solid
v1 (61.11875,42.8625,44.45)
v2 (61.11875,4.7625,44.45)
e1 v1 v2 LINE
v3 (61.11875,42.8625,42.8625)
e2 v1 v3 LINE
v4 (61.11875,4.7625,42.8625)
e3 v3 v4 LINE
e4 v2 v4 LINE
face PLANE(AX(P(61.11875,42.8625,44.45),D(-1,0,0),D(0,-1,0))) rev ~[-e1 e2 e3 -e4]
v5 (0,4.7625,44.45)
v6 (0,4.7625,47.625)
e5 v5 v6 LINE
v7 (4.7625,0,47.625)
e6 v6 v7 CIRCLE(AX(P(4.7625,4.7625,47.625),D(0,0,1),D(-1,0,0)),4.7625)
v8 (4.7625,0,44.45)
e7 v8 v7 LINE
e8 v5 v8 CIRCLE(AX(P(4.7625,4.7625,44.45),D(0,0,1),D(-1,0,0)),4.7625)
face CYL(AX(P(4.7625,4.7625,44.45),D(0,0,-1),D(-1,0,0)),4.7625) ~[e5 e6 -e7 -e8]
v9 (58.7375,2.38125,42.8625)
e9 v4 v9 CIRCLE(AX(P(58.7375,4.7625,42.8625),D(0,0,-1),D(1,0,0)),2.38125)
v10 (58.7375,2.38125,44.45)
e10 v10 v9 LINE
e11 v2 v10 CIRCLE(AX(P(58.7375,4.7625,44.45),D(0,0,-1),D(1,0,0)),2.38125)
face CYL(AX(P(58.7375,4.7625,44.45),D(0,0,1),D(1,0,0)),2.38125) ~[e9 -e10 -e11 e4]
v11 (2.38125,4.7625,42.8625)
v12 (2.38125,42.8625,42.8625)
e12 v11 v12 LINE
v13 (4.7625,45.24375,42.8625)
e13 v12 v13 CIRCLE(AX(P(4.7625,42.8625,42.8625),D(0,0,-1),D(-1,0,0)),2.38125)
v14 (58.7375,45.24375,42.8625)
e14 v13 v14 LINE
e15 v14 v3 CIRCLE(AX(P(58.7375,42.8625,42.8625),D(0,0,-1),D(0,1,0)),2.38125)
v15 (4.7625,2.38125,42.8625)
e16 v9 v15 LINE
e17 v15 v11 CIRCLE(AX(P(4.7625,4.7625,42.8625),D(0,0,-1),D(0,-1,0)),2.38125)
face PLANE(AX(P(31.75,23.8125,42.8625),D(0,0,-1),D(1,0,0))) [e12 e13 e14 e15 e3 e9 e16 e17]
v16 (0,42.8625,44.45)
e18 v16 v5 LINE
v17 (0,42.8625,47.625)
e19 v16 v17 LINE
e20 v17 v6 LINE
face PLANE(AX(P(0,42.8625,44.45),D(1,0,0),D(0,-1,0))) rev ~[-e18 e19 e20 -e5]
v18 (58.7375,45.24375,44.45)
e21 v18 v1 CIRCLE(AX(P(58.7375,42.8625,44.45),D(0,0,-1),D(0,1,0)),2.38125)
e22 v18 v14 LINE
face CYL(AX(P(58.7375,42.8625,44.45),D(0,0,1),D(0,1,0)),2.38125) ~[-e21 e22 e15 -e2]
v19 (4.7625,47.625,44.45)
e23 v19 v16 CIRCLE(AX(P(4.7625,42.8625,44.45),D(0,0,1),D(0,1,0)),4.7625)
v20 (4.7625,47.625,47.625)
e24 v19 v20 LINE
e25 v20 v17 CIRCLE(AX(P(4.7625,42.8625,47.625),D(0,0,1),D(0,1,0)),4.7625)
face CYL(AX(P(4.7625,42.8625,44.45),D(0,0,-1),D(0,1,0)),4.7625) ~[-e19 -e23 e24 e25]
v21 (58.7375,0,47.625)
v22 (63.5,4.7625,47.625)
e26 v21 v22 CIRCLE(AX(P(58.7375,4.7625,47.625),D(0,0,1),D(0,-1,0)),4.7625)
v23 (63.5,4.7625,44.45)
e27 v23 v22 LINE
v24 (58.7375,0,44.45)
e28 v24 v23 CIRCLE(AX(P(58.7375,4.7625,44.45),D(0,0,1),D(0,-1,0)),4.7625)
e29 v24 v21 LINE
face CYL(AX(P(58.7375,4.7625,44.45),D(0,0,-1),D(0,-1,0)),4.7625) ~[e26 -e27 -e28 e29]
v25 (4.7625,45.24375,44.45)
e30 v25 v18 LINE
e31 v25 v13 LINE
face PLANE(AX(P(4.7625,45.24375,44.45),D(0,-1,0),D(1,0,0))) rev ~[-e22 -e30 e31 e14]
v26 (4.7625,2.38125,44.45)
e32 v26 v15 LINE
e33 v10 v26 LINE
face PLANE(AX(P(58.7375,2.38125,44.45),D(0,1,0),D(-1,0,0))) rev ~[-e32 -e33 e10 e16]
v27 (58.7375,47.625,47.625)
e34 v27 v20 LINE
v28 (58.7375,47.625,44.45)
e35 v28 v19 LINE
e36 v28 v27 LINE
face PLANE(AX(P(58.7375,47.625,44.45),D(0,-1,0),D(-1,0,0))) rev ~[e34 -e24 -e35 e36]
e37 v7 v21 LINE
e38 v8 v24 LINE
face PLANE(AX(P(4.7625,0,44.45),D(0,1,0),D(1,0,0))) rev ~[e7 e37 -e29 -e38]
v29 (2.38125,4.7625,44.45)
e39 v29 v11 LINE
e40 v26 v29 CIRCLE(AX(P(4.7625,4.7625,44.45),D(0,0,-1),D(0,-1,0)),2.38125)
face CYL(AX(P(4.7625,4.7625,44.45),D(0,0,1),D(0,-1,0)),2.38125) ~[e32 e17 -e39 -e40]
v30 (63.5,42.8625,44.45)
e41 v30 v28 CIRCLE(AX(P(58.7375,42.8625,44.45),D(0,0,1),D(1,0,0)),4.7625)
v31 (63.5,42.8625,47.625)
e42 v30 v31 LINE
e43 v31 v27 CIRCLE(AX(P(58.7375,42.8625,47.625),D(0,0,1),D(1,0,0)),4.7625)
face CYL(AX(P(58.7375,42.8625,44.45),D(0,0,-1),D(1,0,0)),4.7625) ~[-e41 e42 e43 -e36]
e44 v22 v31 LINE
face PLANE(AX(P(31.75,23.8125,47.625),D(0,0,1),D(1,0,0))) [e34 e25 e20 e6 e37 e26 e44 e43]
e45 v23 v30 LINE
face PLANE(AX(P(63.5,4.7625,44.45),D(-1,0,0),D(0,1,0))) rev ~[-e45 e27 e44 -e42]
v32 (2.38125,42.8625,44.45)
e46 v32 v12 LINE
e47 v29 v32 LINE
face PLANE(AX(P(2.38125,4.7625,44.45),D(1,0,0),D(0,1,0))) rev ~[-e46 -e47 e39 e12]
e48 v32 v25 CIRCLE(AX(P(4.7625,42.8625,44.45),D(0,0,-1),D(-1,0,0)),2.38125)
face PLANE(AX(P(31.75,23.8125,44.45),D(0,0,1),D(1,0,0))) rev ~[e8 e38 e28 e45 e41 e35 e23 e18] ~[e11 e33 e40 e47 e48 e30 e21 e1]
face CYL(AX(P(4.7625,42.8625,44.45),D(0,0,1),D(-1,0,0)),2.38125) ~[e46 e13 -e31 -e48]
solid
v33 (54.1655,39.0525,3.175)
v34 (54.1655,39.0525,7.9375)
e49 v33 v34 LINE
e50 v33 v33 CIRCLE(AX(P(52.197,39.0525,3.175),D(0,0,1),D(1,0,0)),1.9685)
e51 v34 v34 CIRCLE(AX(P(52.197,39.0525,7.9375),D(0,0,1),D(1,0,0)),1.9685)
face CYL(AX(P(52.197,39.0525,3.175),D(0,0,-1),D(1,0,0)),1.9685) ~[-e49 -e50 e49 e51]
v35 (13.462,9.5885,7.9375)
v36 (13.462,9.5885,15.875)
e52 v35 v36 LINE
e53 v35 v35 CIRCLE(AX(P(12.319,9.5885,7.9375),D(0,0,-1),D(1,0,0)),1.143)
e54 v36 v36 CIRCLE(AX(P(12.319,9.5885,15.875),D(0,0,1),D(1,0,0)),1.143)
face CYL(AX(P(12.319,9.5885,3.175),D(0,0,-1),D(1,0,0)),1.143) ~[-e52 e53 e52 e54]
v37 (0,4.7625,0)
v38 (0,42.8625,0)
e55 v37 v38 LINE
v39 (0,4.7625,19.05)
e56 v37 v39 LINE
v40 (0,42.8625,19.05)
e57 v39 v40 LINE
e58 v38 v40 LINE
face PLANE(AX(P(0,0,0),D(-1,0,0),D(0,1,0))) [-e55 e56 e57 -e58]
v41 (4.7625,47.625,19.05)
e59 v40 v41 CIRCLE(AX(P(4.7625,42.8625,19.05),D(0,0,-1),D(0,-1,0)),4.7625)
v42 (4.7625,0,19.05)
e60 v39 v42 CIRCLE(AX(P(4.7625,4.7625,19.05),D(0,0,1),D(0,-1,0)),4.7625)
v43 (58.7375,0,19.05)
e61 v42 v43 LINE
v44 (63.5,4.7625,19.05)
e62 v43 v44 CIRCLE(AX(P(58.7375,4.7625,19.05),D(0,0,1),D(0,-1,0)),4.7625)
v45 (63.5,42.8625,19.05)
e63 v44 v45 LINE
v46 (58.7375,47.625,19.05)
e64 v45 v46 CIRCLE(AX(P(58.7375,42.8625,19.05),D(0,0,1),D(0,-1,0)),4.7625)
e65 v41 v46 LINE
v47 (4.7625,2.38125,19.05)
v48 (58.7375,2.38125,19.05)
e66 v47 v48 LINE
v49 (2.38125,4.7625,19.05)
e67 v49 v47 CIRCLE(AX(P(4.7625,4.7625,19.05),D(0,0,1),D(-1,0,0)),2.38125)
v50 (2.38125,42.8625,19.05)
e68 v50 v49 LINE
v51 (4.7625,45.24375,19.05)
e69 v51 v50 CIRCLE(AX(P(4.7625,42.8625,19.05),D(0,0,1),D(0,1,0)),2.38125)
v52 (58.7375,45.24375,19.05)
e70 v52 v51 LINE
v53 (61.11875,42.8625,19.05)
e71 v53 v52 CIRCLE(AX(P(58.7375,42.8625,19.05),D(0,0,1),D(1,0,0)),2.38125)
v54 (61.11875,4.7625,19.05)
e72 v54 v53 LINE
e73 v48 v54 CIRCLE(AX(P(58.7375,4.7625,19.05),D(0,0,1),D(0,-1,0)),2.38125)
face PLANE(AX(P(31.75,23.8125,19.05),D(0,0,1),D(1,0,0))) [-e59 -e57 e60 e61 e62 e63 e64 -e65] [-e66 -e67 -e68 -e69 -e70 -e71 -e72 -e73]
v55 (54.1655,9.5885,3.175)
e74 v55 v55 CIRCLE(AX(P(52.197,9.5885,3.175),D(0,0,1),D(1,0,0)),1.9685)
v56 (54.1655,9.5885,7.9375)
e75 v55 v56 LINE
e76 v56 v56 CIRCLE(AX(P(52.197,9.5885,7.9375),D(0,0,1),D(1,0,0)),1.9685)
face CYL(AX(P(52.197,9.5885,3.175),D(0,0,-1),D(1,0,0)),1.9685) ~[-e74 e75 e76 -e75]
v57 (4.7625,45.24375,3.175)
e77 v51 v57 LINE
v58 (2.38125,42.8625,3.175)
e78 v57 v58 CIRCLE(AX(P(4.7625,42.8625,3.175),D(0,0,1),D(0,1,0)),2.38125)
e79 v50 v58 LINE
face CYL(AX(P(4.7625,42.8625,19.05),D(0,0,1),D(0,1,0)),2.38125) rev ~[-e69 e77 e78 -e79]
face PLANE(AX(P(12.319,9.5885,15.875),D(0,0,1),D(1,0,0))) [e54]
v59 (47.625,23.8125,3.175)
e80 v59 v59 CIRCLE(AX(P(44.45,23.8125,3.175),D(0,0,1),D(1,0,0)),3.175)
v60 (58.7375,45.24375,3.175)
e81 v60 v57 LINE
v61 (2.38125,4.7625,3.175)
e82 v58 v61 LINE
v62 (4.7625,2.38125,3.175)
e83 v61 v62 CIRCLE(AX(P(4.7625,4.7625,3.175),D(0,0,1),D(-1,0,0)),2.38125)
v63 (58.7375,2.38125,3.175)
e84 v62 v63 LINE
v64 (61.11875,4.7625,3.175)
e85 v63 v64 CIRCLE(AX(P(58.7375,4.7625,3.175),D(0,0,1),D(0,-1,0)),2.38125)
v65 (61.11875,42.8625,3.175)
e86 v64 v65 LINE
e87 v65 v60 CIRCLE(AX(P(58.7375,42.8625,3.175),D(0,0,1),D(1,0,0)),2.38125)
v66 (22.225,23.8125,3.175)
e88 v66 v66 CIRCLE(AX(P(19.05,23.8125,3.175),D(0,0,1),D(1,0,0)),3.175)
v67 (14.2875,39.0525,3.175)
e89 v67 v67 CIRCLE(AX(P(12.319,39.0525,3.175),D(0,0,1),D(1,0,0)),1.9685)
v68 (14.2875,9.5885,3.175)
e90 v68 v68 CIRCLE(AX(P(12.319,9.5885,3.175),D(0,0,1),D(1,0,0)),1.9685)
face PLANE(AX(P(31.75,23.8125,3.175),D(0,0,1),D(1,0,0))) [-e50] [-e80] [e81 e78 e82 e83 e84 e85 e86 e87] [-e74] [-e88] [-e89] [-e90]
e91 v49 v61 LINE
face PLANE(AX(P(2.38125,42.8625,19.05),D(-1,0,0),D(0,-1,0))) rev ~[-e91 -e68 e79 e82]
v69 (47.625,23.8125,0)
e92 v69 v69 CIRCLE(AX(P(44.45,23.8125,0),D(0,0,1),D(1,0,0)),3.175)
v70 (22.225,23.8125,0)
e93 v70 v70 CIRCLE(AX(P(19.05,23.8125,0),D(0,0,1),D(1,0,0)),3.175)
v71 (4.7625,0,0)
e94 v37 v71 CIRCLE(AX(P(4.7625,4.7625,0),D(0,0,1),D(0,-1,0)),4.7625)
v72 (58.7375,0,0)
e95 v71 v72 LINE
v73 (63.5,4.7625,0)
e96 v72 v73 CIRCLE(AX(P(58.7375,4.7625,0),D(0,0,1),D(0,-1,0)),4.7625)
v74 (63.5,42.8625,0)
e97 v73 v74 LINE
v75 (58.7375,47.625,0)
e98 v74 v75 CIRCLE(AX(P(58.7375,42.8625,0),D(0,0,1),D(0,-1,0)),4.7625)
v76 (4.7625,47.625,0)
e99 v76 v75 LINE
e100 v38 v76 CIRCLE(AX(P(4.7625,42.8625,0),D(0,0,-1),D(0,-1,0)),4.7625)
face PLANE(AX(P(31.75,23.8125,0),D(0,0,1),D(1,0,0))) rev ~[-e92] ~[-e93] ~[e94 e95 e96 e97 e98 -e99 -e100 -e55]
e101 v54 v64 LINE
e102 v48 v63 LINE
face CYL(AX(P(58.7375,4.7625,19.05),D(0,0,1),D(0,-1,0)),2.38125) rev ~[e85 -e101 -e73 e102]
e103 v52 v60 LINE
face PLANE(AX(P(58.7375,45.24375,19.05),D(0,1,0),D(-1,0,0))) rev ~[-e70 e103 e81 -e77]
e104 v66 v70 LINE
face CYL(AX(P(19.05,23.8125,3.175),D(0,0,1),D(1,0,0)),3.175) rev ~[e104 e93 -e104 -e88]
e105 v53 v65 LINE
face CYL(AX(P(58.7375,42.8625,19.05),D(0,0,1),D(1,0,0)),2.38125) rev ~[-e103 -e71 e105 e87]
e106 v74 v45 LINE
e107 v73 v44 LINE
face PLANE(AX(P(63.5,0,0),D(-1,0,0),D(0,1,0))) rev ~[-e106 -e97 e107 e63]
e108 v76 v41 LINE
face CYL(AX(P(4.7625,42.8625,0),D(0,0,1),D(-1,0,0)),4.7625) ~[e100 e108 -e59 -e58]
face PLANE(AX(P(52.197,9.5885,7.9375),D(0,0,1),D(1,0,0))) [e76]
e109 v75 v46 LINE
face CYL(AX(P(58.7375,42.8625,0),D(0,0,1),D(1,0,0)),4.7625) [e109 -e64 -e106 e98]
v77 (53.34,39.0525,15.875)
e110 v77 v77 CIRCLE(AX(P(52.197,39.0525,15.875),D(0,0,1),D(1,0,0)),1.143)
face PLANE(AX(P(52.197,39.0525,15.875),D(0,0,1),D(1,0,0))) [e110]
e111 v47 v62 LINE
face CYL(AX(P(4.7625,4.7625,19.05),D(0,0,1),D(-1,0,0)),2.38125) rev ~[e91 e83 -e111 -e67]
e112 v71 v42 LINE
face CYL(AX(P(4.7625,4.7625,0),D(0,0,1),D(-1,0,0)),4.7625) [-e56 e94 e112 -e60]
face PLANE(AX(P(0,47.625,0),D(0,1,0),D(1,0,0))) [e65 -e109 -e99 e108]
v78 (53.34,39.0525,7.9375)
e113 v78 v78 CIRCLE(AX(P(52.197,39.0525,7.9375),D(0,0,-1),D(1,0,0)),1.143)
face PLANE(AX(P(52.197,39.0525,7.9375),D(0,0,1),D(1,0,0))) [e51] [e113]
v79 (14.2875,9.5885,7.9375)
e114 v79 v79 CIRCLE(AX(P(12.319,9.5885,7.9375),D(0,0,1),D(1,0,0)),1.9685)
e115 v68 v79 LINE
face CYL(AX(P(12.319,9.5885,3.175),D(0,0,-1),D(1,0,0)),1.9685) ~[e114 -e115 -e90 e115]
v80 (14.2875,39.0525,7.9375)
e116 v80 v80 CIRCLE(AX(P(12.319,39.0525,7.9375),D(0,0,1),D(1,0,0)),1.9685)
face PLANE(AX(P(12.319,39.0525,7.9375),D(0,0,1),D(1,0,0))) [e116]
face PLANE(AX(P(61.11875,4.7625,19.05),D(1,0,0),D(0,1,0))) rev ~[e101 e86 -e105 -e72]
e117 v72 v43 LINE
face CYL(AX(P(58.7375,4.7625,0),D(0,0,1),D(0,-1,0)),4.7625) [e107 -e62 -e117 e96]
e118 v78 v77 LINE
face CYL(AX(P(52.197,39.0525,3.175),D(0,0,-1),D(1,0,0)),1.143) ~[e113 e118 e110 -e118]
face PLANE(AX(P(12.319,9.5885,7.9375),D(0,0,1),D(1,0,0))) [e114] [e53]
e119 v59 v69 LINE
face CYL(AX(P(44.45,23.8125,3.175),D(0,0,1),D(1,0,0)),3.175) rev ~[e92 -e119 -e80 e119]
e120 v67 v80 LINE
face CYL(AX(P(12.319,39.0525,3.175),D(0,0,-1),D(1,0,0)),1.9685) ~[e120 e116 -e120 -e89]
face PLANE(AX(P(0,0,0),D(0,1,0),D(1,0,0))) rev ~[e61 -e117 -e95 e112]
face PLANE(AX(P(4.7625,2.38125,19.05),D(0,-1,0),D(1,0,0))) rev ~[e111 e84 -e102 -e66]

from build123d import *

# Parameters (mm, degrees)
F0_W      = 63.5
F0_H      = 47.625
F1_DEPTH  = 19.05
F2_R      = 4.7625
F4_DEPTH  = 15.875
F5_R      = 1.143
F6_DEPTH  = 12.7
F7_R      = 1.9685
F8_DEPTH  = 4.7625
F9_R      = 3.175
F10_DEPTH = 25.4
F13_DEPTH = 3.175
F15_DEPTH = 1.5875


with BuildPart() as f1:
    # F0 (on Top) → F1 (new body)
    with BuildSketch(Plane.XY):
        with Locations((31.75, 23.8125)):
            Rectangle(F0_W, F0_H)
    extrude(amount=F1_DEPTH)

    # F2
    f2_edges = [f1.edges().sort_by_distance(p)[0] for p in [
        (0, 0, 9.525),
        (63.5, 0, 9.525),
        (63.5, 47.625, 9.525),
        (0, 47.625, 9.525),
    ]]
    fillet(f2_edges, radius=F2_R)

    # F3 (on face) → F4 (cut)
    with BuildSketch(Plane.XY.offset(19.05)):
        with BuildLine():
            ThreePointArc((61.11875, 42.8625), (60.4212980227, 44.5462980227), (58.7375, 45.24375))
            Line((58.7375, 45.24375), (4.7625, 45.24375))
            ThreePointArc((4.7625, 45.24375), (3.0787019773, 44.5462980227), (2.38125, 42.8625))
            Line((2.38125, 42.8625), (2.38125, 4.7625))
            ThreePointArc((2.38125, 4.7625), (3.0787019773, 3.0787019773), (4.7625, 2.38125))
            Line((4.7625, 2.38125), (58.7375, 2.38125))
            ThreePointArc((58.7375, 2.38125), (60.4212980227, 3.0787019773), (61.11875, 4.7625))
            Line((61.11875, 4.7625), (61.11875, 42.8625))
        make_face()
    extrude(amount=-F4_DEPTH, mode=Mode.SUBTRACT)

    # F5 (on face) → F6 (join)
    with BuildSketch(Plane.XY.offset(3.175)):
        with Locations((12.319, 9.5885)):
            Circle(F5_R)
        with Locations((52.197, 39.0525)):
            Circle(F5_R)
    extrude(amount=F6_DEPTH)

    # F7 (on face) → F8 (join)
    with BuildSketch(Plane.XY.offset(3.175)):
        with Locations((12.319, 9.5885)):
            Circle(F7_R)
        with Locations((52.197, 39.0525)):
            Circle(F7_R)
        with Locations((12.319, 39.0525)):
            Circle(F7_R)
        with Locations((52.197, 9.5885)):
            Circle(F7_R)
    extrude(amount=F8_DEPTH)

    # F9 (on face) → F10 (cut)
    with BuildSketch(Plane.XY.offset(3.175)):
        with Locations((44.45, 23.8125)):
            Circle(F9_R)
        with Locations((19.05, 23.8125)):
            Circle(F9_R)
    extrude(amount=-F10_DEPTH, mode=Mode.SUBTRACT)


with BuildPart() as f13:
    # F12 (on offset) → F13 (new body)
    with BuildSketch(Plane.XY.offset(44.45)):
        with BuildLine():
            Line((0, 42.8625), (0, 4.7625))
            ThreePointArc((0, 4.7625), (1.3949039546, 1.3949039546), (4.7625, 0))
            Line((4.7625, 0), (58.7375, 0))
            ThreePointArc((58.7375, 0), (62.1050960454, 1.3949039546), (63.5, 4.7625))
            Line((63.5, 4.7625), (63.5, 42.8625))
            ThreePointArc((63.5, 42.8625), (62.1050960454, 46.2300960454), (58.7375, 47.625))
            Line((58.7375, 47.625), (4.7625, 47.625))
            ThreePointArc((4.7625, 47.625), (1.3949039546, 46.2300960454), (0, 42.8625))
        make_face()
    extrude(amount=F13_DEPTH)

    # F14 (on face) → F15 (join)
    with BuildSketch(Plane(origin=(0, 0, 44.45), x_dir=(1, 0, 0), z_dir=(0, 0, -1))):
        with BuildLine():
            Line((4.7625, -45.24375), (58.7375, -45.24375))
            ThreePointArc((58.7375, -45.24375), (60.4212980227, -44.5462980227), (61.11875, -42.8625))
            Line((61.11875, -42.8625), (61.11875, -4.7625))
            ThreePointArc((61.11875, -4.7625), (60.4212980227, -3.0787019773), (58.7375, -2.38125))
            Line((58.7375, -2.38125), (4.7625, -2.38125))
            ThreePointArc((4.7625, -2.38125), (3.0787019773, -3.0787019773), (2.38125, -4.7625))
            Line((2.38125, -4.7625), (2.38125, -42.8625))
            ThreePointArc((2.38125, -42.8625), (3.0787019773, -44.5462980227), (4.7625, -45.24375))
        make_face()
    extrude(amount=F15_DEPTH)


solid = Compound([f1.part, f13.part])
